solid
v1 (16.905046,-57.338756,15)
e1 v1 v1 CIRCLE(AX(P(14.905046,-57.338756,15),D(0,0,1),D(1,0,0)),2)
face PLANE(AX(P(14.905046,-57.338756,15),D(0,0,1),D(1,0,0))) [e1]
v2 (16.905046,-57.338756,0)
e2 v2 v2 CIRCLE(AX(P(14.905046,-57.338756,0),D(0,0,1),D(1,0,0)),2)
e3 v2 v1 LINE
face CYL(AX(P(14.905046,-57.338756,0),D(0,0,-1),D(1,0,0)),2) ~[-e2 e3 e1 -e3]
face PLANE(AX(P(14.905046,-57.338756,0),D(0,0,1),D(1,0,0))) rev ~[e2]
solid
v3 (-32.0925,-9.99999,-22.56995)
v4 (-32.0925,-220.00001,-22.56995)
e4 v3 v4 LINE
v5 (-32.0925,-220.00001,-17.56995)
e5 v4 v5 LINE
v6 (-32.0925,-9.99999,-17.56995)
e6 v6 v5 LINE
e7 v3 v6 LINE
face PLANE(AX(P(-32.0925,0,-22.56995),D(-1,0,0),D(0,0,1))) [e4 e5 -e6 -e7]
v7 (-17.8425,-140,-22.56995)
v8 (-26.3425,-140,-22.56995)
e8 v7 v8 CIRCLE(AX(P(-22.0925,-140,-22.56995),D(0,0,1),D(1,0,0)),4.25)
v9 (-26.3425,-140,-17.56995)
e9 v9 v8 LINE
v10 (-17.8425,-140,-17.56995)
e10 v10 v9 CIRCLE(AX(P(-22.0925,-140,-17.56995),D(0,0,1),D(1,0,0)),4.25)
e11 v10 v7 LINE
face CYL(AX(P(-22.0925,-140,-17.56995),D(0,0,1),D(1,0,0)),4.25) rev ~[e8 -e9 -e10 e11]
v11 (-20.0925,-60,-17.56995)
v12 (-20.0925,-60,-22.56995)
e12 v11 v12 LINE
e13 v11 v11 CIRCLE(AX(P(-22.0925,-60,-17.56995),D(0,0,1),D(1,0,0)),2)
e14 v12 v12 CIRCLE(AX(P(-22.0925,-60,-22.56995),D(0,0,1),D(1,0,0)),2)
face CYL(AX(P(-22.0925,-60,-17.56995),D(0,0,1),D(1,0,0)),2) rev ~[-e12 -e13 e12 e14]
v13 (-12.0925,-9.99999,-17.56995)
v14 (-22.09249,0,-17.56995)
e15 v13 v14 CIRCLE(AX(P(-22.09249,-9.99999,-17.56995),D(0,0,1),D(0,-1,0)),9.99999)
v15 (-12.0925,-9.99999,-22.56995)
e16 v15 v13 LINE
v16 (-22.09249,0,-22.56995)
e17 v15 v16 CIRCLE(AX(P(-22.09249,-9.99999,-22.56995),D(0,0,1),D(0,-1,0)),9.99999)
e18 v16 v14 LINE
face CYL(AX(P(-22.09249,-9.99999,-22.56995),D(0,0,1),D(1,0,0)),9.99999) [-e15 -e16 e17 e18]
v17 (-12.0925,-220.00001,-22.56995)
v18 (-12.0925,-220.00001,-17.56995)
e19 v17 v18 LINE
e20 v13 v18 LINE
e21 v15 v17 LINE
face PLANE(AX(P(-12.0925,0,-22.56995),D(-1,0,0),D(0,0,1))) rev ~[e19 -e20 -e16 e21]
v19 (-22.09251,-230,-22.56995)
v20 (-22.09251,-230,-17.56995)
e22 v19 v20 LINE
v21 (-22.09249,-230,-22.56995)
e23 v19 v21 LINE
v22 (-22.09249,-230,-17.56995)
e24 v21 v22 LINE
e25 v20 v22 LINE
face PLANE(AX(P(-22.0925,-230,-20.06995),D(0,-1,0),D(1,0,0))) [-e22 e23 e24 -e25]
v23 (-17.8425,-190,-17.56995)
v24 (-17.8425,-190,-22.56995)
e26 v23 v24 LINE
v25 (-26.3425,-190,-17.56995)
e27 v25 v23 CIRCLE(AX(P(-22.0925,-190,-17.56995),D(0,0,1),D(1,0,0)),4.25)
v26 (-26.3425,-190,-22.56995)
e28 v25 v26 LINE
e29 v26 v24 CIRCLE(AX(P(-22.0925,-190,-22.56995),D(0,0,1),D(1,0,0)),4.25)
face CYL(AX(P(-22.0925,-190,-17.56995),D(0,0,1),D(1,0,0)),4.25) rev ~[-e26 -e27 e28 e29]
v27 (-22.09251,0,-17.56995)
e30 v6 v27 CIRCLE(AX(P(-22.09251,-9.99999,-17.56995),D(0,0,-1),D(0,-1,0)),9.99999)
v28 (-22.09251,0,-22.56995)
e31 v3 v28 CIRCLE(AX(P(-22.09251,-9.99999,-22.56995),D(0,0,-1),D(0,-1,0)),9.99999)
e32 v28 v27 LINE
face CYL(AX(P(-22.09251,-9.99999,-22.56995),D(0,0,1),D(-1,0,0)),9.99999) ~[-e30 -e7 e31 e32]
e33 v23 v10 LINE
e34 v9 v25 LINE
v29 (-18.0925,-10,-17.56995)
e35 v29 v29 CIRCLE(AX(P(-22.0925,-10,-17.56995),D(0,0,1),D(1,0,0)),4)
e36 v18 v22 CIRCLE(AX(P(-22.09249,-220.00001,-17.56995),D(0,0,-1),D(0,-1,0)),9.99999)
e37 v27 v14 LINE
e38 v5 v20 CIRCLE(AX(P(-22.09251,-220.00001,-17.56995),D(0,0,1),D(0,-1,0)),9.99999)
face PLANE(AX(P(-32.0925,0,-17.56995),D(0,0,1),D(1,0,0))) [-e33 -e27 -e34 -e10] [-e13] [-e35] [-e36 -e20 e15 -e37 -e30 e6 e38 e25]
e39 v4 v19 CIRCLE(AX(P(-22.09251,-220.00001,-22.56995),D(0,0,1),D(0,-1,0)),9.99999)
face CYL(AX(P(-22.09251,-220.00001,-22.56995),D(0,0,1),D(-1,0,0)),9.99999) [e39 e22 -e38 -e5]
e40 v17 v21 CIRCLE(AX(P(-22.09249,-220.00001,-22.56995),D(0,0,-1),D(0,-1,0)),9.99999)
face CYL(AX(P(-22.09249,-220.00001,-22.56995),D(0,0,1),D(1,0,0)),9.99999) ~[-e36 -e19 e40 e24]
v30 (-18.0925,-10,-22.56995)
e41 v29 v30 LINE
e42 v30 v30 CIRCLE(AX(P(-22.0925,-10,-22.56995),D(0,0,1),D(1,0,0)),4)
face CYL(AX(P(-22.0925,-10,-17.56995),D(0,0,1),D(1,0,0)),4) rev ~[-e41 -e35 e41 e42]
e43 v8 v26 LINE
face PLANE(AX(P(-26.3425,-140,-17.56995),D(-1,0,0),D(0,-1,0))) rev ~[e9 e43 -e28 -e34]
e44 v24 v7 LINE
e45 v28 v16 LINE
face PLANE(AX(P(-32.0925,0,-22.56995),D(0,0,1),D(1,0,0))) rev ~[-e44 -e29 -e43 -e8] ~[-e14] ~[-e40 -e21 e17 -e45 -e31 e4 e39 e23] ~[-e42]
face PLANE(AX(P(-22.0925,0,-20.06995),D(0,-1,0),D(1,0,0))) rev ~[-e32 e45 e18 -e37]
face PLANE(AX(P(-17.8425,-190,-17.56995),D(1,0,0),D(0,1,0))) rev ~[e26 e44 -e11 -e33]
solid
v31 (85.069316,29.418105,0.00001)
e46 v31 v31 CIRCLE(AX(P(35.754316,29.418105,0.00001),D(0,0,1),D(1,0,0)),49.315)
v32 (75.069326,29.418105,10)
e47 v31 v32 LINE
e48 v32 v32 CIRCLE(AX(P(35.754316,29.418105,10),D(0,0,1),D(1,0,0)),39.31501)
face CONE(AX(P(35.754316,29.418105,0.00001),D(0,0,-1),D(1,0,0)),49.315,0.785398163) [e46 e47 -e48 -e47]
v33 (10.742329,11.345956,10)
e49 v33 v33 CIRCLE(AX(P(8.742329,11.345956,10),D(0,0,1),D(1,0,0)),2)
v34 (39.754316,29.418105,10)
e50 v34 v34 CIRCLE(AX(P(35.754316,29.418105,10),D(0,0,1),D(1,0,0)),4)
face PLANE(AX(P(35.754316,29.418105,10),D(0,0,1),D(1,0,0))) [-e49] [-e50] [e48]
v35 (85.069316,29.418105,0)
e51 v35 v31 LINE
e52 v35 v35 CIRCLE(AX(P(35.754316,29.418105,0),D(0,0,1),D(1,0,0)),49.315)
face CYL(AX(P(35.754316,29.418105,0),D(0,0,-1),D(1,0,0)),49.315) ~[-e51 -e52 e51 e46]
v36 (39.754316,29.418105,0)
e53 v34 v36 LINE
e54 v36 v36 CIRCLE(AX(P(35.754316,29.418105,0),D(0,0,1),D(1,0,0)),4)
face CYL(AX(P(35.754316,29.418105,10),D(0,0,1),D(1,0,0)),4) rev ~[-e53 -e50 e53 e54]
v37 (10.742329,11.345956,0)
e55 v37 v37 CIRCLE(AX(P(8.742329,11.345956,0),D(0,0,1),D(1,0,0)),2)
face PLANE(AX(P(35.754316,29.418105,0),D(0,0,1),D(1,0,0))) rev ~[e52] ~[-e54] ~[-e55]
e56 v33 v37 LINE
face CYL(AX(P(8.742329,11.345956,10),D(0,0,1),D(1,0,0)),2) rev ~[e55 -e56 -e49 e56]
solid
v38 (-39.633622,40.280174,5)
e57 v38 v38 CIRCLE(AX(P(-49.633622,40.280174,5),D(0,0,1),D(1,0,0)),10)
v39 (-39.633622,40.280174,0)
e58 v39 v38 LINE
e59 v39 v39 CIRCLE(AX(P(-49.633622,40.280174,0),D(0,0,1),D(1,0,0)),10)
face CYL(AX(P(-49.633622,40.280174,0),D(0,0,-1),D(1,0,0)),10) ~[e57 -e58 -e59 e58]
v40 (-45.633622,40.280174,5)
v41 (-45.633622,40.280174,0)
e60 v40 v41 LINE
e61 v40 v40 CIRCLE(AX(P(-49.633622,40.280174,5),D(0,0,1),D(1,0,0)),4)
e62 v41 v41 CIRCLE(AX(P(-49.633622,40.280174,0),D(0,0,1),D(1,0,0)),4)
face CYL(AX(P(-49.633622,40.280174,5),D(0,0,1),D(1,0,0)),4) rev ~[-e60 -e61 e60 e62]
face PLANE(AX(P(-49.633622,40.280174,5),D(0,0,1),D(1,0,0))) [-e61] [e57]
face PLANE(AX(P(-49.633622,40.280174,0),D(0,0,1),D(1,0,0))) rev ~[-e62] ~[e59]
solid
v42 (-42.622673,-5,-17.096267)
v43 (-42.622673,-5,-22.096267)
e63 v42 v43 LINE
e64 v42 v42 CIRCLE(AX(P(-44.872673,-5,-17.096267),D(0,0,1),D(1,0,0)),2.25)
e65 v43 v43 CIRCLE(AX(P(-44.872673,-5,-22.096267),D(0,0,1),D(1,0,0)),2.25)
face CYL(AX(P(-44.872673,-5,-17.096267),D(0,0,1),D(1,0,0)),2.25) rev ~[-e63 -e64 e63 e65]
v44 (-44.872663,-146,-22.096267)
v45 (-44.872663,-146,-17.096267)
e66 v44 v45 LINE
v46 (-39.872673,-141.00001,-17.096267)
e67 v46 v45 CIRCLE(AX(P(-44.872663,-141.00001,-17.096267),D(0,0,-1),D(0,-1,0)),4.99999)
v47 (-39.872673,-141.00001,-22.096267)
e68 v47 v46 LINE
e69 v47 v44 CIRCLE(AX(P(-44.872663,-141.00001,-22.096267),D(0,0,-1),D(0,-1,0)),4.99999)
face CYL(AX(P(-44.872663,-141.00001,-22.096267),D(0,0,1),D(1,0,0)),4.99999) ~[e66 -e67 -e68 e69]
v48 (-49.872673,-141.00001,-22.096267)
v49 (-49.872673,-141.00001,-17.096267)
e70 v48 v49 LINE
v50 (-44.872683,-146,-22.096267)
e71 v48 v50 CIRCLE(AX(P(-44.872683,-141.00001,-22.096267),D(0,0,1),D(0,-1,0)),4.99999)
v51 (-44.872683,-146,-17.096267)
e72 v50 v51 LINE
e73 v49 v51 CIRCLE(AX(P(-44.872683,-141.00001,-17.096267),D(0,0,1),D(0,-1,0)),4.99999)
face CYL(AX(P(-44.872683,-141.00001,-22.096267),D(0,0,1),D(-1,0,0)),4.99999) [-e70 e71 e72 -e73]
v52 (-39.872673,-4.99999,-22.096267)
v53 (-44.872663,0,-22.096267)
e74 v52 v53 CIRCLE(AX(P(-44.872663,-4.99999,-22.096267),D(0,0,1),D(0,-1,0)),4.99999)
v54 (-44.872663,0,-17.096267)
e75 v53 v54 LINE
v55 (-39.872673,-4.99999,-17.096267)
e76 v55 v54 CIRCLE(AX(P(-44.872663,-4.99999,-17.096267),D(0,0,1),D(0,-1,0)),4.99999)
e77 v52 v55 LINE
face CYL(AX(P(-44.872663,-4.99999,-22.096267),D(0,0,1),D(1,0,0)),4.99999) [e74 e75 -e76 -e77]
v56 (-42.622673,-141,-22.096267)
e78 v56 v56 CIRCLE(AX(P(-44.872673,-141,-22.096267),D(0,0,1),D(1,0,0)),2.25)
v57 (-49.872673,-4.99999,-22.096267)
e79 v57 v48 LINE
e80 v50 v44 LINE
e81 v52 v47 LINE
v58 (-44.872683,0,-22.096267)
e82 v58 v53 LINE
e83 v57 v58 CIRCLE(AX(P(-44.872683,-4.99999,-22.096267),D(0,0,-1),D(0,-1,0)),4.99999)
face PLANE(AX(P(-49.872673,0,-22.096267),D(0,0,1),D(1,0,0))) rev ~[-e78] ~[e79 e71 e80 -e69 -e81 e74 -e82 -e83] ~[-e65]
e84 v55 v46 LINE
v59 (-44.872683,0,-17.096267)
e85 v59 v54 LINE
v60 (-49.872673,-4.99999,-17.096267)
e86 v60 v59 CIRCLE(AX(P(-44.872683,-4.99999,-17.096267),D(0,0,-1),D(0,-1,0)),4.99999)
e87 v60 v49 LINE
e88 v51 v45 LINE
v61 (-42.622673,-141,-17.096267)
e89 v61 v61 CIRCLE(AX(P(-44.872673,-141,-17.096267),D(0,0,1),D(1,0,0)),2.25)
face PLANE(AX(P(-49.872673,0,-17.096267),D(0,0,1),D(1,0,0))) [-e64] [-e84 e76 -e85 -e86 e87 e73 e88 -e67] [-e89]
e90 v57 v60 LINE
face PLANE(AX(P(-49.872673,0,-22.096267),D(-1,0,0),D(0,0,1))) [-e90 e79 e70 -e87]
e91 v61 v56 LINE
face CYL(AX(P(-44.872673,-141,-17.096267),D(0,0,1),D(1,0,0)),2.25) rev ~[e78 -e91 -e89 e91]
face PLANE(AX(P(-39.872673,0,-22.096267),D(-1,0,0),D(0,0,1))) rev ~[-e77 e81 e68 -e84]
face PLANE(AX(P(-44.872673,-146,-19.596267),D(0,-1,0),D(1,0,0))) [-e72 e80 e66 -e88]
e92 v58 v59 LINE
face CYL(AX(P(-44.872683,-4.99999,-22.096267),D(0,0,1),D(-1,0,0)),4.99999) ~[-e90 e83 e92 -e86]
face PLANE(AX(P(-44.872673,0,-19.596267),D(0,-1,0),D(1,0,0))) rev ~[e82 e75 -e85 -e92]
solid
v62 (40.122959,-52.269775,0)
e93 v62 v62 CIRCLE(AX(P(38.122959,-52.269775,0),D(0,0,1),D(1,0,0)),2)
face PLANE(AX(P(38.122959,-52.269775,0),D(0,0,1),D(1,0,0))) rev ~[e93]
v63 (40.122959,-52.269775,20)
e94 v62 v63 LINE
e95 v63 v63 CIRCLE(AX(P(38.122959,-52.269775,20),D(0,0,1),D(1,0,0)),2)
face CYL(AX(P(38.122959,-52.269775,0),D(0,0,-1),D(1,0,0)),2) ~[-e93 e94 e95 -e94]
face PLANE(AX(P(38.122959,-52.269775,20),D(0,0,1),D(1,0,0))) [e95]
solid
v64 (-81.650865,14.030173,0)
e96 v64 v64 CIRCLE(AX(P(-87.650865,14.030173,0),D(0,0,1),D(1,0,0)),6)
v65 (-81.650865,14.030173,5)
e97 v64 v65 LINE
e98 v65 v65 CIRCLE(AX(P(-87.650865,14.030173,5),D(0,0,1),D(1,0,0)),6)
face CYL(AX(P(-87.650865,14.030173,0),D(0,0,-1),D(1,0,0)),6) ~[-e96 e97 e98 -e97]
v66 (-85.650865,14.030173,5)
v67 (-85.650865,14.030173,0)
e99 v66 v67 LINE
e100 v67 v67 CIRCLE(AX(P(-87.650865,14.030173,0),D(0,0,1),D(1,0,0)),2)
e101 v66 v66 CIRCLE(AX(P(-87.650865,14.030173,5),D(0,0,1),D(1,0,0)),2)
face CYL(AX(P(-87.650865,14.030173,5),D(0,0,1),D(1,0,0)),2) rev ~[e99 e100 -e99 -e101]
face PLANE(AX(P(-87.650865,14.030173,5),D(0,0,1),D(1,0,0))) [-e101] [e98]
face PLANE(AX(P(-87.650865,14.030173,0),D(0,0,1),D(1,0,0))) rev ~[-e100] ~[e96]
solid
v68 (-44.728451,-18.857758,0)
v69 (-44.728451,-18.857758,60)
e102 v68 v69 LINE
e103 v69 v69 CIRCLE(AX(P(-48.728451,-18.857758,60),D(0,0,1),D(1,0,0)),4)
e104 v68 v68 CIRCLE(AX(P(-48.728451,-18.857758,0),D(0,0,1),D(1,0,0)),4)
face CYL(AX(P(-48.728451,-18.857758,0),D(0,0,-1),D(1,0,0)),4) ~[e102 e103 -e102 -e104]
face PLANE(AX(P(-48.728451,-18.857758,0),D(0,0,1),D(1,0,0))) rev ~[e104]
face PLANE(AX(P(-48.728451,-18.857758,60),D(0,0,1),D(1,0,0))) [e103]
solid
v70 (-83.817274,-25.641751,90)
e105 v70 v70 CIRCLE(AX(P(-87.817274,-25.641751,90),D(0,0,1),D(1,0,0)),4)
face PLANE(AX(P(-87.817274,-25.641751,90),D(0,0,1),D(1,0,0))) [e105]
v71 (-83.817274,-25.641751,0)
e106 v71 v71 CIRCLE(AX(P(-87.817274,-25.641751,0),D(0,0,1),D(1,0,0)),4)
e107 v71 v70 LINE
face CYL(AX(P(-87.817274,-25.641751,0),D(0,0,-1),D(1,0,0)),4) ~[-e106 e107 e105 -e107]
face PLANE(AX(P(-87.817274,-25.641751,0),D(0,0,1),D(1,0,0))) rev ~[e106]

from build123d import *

# Parameters (mm, degrees)
F0_R      = 49.315
F1_DEPTH  = 10
F2_SIZE   = 9.99999
F3_R      = 4
F3_R_2    = 2
F4_DEPTH  = 10.001
F5_R      = 10
F6_DEPTH  = 5
F5_R_2    = 6
F7_R      = 4
F8_DEPTH  = 5.001
F9_R      = 4
F10_DEPTH = 60
F11_R     = 2
F12_DEPTH = 5.001
F13_W     = 10
F13_H     = 5
F14_DEPTH = 146
F15_R     = 4.99999
F16_R     = 2.25
F17_DEPTH = 5.001
F18_W     = 20
F18_H     = 5
F19_DEPTH = 230
F20_R     = 9.99999
F21_R     = 4
F22_DEPTH = 5.001
F23_R     = 2
F24_DEPTH = 5.001
F25_R     = 4
F26_DEPTH = 90
F27_R     = 2
F28_DEPTH = 15
F29_R     = 2
F30_DEPTH = 20


# Not quite as in the source:
# - a fillet or chamfer is up to 0.001 mm smaller than in the source, because OpenCascade refuses the exact size


with BuildPart() as f1:
    # F0 (on Top) → F1 (new body)
    with BuildSketch(Plane.XY):
        with Locations((35.7543155551, 29.4181052595)):
            Circle(F0_R)
    extrude(amount=F1_DEPTH)

    # F2 (size 10 in the source; OpenCascade refuses exactly that, so slightly less here)
    f2_edges = [f1.edges().sort_by_distance(p)[0] for p in [
        (-13.560684, 29.418105, 10),
    ]]
    chamfer(f2_edges, length=F2_SIZE)

    # F3 (on face) → F4 (cut, through all)
    with BuildSketch(Plane.XY.offset(10)):
        with Locations((35.7543155551, 29.4181052595)):
            Circle(F3_R)
        with Locations((8.7423292544, 11.3459555233)):
            Circle(F3_R_2)
    extrude(amount=-F4_DEPTH, mode=Mode.SUBTRACT)


with BuildPart() as f6:
    # F5 (on Top) → F6 (new body)
    with BuildSketch(Plane.XY):
        with Locations((-49.6336221695, 40.280174464)):
            Circle(F5_R)
    extrude(amount=F6_DEPTH)

    # F7 (on face) → F8 (cut, through all)
    with BuildSketch(Plane.XY.offset(5)):
        with Locations((-49.6336221695, 40.280174464)):
            Circle(F7_R)
    extrude(amount=-F8_DEPTH, mode=Mode.SUBTRACT)


with BuildPart() as f6b:
    # F5 (on Top) → F6, piece 2 (new body)
    with BuildSketch(Plane.XY):
        with Locations((-87.6508653164, 14.0301734209)):
            Circle(F5_R_2)
    extrude(amount=F6_DEPTH)

    # F11 (on face) → F12 (cut, through all)
    with BuildSketch(Plane.XY.offset(5)):
        with Locations((-87.6508653164, 14.0301734209)):
            Circle(F11_R)
    extrude(amount=-F12_DEPTH, mode=Mode.SUBTRACT)


with BuildPart() as f10:
    # F9 (on Top) → F10 (new body)
    with BuildSketch(Plane.XY):
        with Locations((-48.7284511328, -18.8577584922)):
            Circle(F9_R)
    extrude(amount=F10_DEPTH)


with BuildPart() as f14:
    # F13 (on Front) → F14 (new body)
    with BuildSketch(Plane.XZ):
        with Locations((-44.8726732284, -19.596266548)):
            Rectangle(F13_W, F13_H)
    extrude(amount=F14_DEPTH)

    # F15 (radius 5 in the source; OpenCascade refuses exactly that, so slightly less here)
    f15_edges = [f14.edges().sort_by_distance(p)[0] for p in [
        (-49.872673, -146, -19.596267),
        (-39.872673, -146, -19.596267),
        (-39.872673, 0, -19.596267),
        (-49.872673, 0, -19.596267),
    ]]
    fillet(f15_edges, radius=F15_R)

    # F16 (on face) → F17 (cut, through all)
    with BuildSketch(Plane.XY.offset(-17.096266548)):
        with Locations((-44.8726732284, -5)):
            Circle(F16_R)
        with Locations((-44.8726732284, -141)):
            Circle(F16_R)
    extrude(amount=-F17_DEPTH, mode=Mode.SUBTRACT)


with BuildPart() as f19:
    # F18 (on Front) → F19 (new body)
    with BuildSketch(Plane.XZ):
        with Locations((-22.0925002359, -20.0699501518)):
            Rectangle(F18_W, F18_H)
    extrude(amount=F19_DEPTH)

    # F20 (radius 10 in the source; OpenCascade refuses exactly that, so slightly less here)
    f20_edges = [f19.edges().sort_by_distance(p)[0] for p in [
        (-32.0925, -230, -20.06995),
        (-12.0925, -230, -20.06995),
        (-32.0925, 0, -20.06995),
        (-12.0925, 0, -20.06995),
    ]]
    fillet(f20_edges, radius=F20_R)

    # F21 (on face) → F22 (cut, through all)
    with BuildSketch(Plane.XY.offset(-17.5699501518)):
        with Locations((-22.0925002359, -10)):
            Circle(F21_R)
        with BuildLine():
            ThreePointArc((-26.3425002359, -140), (-22.0925002359, -144.25), (-17.8425002359, -140))
            ThreePointArc((-17.8425002359, -140), (-22.0925002359, -135.75), (-26.3425002359, -140))
        make_face()
        with BuildLine():
            Line((-17.8425002359, -190), (-17.8425002359, -140))
            ThreePointArc((-17.8425002359, -140), (-22.0925002359, -144.25), (-26.3425002359, -140))
            Line((-26.3425002359, -140), (-26.3425002359, -190))
            ThreePointArc((-26.3425002359, -190), (-22.0925002359, -185.75), (-17.8425002359, -190))
        make_face()
        with BuildLine():
            ThreePointArc((-26.3425002359, -190), (-22.0925002359, -194.25), (-17.8425002359, -190))
            ThreePointArc((-17.8425002359, -190), (-22.0925002359, -185.75), (-26.3425002359, -190))
        make_face()
    extrude(amount=-F22_DEPTH, mode=Mode.SUBTRACT)

    # F23 (on face) → F24 (cut, through all)
    with BuildSketch(Plane.XY.offset(-17.5699501518)):
        with Locations((-22.0925002359, -60)):
            Circle(F23_R)
    extrude(amount=-F24_DEPTH, mode=Mode.SUBTRACT)


with BuildPart() as f26:
    # F25 (on Top) → F26 (new body)
    with BuildSketch(Plane.XY):
        with Locations((-87.817274034, -25.6417505443)):
            Circle(F25_R)
    extrude(amount=F26_DEPTH)


with BuildPart() as f28:
    # F27 (on Top) → F28 (new body)
    with BuildSketch(Plane.XY):
        with Locations((14.9050457403, -57.3387555778)):
            Circle(F27_R)
    extrude(amount=F28_DEPTH)


with BuildPart() as f30:
    # F29 (on Top) → F30 (new body)
    with BuildSketch(Plane.XY):
        with Locations((38.122959435, -52.2697754204)):
            Circle(F29_R)
    extrude(amount=F30_DEPTH)


solid = Compound([f1.part, f6.part, f6b.part, f10.part, f14.part, f19.part, f26.part, f28.part, f30.part])
